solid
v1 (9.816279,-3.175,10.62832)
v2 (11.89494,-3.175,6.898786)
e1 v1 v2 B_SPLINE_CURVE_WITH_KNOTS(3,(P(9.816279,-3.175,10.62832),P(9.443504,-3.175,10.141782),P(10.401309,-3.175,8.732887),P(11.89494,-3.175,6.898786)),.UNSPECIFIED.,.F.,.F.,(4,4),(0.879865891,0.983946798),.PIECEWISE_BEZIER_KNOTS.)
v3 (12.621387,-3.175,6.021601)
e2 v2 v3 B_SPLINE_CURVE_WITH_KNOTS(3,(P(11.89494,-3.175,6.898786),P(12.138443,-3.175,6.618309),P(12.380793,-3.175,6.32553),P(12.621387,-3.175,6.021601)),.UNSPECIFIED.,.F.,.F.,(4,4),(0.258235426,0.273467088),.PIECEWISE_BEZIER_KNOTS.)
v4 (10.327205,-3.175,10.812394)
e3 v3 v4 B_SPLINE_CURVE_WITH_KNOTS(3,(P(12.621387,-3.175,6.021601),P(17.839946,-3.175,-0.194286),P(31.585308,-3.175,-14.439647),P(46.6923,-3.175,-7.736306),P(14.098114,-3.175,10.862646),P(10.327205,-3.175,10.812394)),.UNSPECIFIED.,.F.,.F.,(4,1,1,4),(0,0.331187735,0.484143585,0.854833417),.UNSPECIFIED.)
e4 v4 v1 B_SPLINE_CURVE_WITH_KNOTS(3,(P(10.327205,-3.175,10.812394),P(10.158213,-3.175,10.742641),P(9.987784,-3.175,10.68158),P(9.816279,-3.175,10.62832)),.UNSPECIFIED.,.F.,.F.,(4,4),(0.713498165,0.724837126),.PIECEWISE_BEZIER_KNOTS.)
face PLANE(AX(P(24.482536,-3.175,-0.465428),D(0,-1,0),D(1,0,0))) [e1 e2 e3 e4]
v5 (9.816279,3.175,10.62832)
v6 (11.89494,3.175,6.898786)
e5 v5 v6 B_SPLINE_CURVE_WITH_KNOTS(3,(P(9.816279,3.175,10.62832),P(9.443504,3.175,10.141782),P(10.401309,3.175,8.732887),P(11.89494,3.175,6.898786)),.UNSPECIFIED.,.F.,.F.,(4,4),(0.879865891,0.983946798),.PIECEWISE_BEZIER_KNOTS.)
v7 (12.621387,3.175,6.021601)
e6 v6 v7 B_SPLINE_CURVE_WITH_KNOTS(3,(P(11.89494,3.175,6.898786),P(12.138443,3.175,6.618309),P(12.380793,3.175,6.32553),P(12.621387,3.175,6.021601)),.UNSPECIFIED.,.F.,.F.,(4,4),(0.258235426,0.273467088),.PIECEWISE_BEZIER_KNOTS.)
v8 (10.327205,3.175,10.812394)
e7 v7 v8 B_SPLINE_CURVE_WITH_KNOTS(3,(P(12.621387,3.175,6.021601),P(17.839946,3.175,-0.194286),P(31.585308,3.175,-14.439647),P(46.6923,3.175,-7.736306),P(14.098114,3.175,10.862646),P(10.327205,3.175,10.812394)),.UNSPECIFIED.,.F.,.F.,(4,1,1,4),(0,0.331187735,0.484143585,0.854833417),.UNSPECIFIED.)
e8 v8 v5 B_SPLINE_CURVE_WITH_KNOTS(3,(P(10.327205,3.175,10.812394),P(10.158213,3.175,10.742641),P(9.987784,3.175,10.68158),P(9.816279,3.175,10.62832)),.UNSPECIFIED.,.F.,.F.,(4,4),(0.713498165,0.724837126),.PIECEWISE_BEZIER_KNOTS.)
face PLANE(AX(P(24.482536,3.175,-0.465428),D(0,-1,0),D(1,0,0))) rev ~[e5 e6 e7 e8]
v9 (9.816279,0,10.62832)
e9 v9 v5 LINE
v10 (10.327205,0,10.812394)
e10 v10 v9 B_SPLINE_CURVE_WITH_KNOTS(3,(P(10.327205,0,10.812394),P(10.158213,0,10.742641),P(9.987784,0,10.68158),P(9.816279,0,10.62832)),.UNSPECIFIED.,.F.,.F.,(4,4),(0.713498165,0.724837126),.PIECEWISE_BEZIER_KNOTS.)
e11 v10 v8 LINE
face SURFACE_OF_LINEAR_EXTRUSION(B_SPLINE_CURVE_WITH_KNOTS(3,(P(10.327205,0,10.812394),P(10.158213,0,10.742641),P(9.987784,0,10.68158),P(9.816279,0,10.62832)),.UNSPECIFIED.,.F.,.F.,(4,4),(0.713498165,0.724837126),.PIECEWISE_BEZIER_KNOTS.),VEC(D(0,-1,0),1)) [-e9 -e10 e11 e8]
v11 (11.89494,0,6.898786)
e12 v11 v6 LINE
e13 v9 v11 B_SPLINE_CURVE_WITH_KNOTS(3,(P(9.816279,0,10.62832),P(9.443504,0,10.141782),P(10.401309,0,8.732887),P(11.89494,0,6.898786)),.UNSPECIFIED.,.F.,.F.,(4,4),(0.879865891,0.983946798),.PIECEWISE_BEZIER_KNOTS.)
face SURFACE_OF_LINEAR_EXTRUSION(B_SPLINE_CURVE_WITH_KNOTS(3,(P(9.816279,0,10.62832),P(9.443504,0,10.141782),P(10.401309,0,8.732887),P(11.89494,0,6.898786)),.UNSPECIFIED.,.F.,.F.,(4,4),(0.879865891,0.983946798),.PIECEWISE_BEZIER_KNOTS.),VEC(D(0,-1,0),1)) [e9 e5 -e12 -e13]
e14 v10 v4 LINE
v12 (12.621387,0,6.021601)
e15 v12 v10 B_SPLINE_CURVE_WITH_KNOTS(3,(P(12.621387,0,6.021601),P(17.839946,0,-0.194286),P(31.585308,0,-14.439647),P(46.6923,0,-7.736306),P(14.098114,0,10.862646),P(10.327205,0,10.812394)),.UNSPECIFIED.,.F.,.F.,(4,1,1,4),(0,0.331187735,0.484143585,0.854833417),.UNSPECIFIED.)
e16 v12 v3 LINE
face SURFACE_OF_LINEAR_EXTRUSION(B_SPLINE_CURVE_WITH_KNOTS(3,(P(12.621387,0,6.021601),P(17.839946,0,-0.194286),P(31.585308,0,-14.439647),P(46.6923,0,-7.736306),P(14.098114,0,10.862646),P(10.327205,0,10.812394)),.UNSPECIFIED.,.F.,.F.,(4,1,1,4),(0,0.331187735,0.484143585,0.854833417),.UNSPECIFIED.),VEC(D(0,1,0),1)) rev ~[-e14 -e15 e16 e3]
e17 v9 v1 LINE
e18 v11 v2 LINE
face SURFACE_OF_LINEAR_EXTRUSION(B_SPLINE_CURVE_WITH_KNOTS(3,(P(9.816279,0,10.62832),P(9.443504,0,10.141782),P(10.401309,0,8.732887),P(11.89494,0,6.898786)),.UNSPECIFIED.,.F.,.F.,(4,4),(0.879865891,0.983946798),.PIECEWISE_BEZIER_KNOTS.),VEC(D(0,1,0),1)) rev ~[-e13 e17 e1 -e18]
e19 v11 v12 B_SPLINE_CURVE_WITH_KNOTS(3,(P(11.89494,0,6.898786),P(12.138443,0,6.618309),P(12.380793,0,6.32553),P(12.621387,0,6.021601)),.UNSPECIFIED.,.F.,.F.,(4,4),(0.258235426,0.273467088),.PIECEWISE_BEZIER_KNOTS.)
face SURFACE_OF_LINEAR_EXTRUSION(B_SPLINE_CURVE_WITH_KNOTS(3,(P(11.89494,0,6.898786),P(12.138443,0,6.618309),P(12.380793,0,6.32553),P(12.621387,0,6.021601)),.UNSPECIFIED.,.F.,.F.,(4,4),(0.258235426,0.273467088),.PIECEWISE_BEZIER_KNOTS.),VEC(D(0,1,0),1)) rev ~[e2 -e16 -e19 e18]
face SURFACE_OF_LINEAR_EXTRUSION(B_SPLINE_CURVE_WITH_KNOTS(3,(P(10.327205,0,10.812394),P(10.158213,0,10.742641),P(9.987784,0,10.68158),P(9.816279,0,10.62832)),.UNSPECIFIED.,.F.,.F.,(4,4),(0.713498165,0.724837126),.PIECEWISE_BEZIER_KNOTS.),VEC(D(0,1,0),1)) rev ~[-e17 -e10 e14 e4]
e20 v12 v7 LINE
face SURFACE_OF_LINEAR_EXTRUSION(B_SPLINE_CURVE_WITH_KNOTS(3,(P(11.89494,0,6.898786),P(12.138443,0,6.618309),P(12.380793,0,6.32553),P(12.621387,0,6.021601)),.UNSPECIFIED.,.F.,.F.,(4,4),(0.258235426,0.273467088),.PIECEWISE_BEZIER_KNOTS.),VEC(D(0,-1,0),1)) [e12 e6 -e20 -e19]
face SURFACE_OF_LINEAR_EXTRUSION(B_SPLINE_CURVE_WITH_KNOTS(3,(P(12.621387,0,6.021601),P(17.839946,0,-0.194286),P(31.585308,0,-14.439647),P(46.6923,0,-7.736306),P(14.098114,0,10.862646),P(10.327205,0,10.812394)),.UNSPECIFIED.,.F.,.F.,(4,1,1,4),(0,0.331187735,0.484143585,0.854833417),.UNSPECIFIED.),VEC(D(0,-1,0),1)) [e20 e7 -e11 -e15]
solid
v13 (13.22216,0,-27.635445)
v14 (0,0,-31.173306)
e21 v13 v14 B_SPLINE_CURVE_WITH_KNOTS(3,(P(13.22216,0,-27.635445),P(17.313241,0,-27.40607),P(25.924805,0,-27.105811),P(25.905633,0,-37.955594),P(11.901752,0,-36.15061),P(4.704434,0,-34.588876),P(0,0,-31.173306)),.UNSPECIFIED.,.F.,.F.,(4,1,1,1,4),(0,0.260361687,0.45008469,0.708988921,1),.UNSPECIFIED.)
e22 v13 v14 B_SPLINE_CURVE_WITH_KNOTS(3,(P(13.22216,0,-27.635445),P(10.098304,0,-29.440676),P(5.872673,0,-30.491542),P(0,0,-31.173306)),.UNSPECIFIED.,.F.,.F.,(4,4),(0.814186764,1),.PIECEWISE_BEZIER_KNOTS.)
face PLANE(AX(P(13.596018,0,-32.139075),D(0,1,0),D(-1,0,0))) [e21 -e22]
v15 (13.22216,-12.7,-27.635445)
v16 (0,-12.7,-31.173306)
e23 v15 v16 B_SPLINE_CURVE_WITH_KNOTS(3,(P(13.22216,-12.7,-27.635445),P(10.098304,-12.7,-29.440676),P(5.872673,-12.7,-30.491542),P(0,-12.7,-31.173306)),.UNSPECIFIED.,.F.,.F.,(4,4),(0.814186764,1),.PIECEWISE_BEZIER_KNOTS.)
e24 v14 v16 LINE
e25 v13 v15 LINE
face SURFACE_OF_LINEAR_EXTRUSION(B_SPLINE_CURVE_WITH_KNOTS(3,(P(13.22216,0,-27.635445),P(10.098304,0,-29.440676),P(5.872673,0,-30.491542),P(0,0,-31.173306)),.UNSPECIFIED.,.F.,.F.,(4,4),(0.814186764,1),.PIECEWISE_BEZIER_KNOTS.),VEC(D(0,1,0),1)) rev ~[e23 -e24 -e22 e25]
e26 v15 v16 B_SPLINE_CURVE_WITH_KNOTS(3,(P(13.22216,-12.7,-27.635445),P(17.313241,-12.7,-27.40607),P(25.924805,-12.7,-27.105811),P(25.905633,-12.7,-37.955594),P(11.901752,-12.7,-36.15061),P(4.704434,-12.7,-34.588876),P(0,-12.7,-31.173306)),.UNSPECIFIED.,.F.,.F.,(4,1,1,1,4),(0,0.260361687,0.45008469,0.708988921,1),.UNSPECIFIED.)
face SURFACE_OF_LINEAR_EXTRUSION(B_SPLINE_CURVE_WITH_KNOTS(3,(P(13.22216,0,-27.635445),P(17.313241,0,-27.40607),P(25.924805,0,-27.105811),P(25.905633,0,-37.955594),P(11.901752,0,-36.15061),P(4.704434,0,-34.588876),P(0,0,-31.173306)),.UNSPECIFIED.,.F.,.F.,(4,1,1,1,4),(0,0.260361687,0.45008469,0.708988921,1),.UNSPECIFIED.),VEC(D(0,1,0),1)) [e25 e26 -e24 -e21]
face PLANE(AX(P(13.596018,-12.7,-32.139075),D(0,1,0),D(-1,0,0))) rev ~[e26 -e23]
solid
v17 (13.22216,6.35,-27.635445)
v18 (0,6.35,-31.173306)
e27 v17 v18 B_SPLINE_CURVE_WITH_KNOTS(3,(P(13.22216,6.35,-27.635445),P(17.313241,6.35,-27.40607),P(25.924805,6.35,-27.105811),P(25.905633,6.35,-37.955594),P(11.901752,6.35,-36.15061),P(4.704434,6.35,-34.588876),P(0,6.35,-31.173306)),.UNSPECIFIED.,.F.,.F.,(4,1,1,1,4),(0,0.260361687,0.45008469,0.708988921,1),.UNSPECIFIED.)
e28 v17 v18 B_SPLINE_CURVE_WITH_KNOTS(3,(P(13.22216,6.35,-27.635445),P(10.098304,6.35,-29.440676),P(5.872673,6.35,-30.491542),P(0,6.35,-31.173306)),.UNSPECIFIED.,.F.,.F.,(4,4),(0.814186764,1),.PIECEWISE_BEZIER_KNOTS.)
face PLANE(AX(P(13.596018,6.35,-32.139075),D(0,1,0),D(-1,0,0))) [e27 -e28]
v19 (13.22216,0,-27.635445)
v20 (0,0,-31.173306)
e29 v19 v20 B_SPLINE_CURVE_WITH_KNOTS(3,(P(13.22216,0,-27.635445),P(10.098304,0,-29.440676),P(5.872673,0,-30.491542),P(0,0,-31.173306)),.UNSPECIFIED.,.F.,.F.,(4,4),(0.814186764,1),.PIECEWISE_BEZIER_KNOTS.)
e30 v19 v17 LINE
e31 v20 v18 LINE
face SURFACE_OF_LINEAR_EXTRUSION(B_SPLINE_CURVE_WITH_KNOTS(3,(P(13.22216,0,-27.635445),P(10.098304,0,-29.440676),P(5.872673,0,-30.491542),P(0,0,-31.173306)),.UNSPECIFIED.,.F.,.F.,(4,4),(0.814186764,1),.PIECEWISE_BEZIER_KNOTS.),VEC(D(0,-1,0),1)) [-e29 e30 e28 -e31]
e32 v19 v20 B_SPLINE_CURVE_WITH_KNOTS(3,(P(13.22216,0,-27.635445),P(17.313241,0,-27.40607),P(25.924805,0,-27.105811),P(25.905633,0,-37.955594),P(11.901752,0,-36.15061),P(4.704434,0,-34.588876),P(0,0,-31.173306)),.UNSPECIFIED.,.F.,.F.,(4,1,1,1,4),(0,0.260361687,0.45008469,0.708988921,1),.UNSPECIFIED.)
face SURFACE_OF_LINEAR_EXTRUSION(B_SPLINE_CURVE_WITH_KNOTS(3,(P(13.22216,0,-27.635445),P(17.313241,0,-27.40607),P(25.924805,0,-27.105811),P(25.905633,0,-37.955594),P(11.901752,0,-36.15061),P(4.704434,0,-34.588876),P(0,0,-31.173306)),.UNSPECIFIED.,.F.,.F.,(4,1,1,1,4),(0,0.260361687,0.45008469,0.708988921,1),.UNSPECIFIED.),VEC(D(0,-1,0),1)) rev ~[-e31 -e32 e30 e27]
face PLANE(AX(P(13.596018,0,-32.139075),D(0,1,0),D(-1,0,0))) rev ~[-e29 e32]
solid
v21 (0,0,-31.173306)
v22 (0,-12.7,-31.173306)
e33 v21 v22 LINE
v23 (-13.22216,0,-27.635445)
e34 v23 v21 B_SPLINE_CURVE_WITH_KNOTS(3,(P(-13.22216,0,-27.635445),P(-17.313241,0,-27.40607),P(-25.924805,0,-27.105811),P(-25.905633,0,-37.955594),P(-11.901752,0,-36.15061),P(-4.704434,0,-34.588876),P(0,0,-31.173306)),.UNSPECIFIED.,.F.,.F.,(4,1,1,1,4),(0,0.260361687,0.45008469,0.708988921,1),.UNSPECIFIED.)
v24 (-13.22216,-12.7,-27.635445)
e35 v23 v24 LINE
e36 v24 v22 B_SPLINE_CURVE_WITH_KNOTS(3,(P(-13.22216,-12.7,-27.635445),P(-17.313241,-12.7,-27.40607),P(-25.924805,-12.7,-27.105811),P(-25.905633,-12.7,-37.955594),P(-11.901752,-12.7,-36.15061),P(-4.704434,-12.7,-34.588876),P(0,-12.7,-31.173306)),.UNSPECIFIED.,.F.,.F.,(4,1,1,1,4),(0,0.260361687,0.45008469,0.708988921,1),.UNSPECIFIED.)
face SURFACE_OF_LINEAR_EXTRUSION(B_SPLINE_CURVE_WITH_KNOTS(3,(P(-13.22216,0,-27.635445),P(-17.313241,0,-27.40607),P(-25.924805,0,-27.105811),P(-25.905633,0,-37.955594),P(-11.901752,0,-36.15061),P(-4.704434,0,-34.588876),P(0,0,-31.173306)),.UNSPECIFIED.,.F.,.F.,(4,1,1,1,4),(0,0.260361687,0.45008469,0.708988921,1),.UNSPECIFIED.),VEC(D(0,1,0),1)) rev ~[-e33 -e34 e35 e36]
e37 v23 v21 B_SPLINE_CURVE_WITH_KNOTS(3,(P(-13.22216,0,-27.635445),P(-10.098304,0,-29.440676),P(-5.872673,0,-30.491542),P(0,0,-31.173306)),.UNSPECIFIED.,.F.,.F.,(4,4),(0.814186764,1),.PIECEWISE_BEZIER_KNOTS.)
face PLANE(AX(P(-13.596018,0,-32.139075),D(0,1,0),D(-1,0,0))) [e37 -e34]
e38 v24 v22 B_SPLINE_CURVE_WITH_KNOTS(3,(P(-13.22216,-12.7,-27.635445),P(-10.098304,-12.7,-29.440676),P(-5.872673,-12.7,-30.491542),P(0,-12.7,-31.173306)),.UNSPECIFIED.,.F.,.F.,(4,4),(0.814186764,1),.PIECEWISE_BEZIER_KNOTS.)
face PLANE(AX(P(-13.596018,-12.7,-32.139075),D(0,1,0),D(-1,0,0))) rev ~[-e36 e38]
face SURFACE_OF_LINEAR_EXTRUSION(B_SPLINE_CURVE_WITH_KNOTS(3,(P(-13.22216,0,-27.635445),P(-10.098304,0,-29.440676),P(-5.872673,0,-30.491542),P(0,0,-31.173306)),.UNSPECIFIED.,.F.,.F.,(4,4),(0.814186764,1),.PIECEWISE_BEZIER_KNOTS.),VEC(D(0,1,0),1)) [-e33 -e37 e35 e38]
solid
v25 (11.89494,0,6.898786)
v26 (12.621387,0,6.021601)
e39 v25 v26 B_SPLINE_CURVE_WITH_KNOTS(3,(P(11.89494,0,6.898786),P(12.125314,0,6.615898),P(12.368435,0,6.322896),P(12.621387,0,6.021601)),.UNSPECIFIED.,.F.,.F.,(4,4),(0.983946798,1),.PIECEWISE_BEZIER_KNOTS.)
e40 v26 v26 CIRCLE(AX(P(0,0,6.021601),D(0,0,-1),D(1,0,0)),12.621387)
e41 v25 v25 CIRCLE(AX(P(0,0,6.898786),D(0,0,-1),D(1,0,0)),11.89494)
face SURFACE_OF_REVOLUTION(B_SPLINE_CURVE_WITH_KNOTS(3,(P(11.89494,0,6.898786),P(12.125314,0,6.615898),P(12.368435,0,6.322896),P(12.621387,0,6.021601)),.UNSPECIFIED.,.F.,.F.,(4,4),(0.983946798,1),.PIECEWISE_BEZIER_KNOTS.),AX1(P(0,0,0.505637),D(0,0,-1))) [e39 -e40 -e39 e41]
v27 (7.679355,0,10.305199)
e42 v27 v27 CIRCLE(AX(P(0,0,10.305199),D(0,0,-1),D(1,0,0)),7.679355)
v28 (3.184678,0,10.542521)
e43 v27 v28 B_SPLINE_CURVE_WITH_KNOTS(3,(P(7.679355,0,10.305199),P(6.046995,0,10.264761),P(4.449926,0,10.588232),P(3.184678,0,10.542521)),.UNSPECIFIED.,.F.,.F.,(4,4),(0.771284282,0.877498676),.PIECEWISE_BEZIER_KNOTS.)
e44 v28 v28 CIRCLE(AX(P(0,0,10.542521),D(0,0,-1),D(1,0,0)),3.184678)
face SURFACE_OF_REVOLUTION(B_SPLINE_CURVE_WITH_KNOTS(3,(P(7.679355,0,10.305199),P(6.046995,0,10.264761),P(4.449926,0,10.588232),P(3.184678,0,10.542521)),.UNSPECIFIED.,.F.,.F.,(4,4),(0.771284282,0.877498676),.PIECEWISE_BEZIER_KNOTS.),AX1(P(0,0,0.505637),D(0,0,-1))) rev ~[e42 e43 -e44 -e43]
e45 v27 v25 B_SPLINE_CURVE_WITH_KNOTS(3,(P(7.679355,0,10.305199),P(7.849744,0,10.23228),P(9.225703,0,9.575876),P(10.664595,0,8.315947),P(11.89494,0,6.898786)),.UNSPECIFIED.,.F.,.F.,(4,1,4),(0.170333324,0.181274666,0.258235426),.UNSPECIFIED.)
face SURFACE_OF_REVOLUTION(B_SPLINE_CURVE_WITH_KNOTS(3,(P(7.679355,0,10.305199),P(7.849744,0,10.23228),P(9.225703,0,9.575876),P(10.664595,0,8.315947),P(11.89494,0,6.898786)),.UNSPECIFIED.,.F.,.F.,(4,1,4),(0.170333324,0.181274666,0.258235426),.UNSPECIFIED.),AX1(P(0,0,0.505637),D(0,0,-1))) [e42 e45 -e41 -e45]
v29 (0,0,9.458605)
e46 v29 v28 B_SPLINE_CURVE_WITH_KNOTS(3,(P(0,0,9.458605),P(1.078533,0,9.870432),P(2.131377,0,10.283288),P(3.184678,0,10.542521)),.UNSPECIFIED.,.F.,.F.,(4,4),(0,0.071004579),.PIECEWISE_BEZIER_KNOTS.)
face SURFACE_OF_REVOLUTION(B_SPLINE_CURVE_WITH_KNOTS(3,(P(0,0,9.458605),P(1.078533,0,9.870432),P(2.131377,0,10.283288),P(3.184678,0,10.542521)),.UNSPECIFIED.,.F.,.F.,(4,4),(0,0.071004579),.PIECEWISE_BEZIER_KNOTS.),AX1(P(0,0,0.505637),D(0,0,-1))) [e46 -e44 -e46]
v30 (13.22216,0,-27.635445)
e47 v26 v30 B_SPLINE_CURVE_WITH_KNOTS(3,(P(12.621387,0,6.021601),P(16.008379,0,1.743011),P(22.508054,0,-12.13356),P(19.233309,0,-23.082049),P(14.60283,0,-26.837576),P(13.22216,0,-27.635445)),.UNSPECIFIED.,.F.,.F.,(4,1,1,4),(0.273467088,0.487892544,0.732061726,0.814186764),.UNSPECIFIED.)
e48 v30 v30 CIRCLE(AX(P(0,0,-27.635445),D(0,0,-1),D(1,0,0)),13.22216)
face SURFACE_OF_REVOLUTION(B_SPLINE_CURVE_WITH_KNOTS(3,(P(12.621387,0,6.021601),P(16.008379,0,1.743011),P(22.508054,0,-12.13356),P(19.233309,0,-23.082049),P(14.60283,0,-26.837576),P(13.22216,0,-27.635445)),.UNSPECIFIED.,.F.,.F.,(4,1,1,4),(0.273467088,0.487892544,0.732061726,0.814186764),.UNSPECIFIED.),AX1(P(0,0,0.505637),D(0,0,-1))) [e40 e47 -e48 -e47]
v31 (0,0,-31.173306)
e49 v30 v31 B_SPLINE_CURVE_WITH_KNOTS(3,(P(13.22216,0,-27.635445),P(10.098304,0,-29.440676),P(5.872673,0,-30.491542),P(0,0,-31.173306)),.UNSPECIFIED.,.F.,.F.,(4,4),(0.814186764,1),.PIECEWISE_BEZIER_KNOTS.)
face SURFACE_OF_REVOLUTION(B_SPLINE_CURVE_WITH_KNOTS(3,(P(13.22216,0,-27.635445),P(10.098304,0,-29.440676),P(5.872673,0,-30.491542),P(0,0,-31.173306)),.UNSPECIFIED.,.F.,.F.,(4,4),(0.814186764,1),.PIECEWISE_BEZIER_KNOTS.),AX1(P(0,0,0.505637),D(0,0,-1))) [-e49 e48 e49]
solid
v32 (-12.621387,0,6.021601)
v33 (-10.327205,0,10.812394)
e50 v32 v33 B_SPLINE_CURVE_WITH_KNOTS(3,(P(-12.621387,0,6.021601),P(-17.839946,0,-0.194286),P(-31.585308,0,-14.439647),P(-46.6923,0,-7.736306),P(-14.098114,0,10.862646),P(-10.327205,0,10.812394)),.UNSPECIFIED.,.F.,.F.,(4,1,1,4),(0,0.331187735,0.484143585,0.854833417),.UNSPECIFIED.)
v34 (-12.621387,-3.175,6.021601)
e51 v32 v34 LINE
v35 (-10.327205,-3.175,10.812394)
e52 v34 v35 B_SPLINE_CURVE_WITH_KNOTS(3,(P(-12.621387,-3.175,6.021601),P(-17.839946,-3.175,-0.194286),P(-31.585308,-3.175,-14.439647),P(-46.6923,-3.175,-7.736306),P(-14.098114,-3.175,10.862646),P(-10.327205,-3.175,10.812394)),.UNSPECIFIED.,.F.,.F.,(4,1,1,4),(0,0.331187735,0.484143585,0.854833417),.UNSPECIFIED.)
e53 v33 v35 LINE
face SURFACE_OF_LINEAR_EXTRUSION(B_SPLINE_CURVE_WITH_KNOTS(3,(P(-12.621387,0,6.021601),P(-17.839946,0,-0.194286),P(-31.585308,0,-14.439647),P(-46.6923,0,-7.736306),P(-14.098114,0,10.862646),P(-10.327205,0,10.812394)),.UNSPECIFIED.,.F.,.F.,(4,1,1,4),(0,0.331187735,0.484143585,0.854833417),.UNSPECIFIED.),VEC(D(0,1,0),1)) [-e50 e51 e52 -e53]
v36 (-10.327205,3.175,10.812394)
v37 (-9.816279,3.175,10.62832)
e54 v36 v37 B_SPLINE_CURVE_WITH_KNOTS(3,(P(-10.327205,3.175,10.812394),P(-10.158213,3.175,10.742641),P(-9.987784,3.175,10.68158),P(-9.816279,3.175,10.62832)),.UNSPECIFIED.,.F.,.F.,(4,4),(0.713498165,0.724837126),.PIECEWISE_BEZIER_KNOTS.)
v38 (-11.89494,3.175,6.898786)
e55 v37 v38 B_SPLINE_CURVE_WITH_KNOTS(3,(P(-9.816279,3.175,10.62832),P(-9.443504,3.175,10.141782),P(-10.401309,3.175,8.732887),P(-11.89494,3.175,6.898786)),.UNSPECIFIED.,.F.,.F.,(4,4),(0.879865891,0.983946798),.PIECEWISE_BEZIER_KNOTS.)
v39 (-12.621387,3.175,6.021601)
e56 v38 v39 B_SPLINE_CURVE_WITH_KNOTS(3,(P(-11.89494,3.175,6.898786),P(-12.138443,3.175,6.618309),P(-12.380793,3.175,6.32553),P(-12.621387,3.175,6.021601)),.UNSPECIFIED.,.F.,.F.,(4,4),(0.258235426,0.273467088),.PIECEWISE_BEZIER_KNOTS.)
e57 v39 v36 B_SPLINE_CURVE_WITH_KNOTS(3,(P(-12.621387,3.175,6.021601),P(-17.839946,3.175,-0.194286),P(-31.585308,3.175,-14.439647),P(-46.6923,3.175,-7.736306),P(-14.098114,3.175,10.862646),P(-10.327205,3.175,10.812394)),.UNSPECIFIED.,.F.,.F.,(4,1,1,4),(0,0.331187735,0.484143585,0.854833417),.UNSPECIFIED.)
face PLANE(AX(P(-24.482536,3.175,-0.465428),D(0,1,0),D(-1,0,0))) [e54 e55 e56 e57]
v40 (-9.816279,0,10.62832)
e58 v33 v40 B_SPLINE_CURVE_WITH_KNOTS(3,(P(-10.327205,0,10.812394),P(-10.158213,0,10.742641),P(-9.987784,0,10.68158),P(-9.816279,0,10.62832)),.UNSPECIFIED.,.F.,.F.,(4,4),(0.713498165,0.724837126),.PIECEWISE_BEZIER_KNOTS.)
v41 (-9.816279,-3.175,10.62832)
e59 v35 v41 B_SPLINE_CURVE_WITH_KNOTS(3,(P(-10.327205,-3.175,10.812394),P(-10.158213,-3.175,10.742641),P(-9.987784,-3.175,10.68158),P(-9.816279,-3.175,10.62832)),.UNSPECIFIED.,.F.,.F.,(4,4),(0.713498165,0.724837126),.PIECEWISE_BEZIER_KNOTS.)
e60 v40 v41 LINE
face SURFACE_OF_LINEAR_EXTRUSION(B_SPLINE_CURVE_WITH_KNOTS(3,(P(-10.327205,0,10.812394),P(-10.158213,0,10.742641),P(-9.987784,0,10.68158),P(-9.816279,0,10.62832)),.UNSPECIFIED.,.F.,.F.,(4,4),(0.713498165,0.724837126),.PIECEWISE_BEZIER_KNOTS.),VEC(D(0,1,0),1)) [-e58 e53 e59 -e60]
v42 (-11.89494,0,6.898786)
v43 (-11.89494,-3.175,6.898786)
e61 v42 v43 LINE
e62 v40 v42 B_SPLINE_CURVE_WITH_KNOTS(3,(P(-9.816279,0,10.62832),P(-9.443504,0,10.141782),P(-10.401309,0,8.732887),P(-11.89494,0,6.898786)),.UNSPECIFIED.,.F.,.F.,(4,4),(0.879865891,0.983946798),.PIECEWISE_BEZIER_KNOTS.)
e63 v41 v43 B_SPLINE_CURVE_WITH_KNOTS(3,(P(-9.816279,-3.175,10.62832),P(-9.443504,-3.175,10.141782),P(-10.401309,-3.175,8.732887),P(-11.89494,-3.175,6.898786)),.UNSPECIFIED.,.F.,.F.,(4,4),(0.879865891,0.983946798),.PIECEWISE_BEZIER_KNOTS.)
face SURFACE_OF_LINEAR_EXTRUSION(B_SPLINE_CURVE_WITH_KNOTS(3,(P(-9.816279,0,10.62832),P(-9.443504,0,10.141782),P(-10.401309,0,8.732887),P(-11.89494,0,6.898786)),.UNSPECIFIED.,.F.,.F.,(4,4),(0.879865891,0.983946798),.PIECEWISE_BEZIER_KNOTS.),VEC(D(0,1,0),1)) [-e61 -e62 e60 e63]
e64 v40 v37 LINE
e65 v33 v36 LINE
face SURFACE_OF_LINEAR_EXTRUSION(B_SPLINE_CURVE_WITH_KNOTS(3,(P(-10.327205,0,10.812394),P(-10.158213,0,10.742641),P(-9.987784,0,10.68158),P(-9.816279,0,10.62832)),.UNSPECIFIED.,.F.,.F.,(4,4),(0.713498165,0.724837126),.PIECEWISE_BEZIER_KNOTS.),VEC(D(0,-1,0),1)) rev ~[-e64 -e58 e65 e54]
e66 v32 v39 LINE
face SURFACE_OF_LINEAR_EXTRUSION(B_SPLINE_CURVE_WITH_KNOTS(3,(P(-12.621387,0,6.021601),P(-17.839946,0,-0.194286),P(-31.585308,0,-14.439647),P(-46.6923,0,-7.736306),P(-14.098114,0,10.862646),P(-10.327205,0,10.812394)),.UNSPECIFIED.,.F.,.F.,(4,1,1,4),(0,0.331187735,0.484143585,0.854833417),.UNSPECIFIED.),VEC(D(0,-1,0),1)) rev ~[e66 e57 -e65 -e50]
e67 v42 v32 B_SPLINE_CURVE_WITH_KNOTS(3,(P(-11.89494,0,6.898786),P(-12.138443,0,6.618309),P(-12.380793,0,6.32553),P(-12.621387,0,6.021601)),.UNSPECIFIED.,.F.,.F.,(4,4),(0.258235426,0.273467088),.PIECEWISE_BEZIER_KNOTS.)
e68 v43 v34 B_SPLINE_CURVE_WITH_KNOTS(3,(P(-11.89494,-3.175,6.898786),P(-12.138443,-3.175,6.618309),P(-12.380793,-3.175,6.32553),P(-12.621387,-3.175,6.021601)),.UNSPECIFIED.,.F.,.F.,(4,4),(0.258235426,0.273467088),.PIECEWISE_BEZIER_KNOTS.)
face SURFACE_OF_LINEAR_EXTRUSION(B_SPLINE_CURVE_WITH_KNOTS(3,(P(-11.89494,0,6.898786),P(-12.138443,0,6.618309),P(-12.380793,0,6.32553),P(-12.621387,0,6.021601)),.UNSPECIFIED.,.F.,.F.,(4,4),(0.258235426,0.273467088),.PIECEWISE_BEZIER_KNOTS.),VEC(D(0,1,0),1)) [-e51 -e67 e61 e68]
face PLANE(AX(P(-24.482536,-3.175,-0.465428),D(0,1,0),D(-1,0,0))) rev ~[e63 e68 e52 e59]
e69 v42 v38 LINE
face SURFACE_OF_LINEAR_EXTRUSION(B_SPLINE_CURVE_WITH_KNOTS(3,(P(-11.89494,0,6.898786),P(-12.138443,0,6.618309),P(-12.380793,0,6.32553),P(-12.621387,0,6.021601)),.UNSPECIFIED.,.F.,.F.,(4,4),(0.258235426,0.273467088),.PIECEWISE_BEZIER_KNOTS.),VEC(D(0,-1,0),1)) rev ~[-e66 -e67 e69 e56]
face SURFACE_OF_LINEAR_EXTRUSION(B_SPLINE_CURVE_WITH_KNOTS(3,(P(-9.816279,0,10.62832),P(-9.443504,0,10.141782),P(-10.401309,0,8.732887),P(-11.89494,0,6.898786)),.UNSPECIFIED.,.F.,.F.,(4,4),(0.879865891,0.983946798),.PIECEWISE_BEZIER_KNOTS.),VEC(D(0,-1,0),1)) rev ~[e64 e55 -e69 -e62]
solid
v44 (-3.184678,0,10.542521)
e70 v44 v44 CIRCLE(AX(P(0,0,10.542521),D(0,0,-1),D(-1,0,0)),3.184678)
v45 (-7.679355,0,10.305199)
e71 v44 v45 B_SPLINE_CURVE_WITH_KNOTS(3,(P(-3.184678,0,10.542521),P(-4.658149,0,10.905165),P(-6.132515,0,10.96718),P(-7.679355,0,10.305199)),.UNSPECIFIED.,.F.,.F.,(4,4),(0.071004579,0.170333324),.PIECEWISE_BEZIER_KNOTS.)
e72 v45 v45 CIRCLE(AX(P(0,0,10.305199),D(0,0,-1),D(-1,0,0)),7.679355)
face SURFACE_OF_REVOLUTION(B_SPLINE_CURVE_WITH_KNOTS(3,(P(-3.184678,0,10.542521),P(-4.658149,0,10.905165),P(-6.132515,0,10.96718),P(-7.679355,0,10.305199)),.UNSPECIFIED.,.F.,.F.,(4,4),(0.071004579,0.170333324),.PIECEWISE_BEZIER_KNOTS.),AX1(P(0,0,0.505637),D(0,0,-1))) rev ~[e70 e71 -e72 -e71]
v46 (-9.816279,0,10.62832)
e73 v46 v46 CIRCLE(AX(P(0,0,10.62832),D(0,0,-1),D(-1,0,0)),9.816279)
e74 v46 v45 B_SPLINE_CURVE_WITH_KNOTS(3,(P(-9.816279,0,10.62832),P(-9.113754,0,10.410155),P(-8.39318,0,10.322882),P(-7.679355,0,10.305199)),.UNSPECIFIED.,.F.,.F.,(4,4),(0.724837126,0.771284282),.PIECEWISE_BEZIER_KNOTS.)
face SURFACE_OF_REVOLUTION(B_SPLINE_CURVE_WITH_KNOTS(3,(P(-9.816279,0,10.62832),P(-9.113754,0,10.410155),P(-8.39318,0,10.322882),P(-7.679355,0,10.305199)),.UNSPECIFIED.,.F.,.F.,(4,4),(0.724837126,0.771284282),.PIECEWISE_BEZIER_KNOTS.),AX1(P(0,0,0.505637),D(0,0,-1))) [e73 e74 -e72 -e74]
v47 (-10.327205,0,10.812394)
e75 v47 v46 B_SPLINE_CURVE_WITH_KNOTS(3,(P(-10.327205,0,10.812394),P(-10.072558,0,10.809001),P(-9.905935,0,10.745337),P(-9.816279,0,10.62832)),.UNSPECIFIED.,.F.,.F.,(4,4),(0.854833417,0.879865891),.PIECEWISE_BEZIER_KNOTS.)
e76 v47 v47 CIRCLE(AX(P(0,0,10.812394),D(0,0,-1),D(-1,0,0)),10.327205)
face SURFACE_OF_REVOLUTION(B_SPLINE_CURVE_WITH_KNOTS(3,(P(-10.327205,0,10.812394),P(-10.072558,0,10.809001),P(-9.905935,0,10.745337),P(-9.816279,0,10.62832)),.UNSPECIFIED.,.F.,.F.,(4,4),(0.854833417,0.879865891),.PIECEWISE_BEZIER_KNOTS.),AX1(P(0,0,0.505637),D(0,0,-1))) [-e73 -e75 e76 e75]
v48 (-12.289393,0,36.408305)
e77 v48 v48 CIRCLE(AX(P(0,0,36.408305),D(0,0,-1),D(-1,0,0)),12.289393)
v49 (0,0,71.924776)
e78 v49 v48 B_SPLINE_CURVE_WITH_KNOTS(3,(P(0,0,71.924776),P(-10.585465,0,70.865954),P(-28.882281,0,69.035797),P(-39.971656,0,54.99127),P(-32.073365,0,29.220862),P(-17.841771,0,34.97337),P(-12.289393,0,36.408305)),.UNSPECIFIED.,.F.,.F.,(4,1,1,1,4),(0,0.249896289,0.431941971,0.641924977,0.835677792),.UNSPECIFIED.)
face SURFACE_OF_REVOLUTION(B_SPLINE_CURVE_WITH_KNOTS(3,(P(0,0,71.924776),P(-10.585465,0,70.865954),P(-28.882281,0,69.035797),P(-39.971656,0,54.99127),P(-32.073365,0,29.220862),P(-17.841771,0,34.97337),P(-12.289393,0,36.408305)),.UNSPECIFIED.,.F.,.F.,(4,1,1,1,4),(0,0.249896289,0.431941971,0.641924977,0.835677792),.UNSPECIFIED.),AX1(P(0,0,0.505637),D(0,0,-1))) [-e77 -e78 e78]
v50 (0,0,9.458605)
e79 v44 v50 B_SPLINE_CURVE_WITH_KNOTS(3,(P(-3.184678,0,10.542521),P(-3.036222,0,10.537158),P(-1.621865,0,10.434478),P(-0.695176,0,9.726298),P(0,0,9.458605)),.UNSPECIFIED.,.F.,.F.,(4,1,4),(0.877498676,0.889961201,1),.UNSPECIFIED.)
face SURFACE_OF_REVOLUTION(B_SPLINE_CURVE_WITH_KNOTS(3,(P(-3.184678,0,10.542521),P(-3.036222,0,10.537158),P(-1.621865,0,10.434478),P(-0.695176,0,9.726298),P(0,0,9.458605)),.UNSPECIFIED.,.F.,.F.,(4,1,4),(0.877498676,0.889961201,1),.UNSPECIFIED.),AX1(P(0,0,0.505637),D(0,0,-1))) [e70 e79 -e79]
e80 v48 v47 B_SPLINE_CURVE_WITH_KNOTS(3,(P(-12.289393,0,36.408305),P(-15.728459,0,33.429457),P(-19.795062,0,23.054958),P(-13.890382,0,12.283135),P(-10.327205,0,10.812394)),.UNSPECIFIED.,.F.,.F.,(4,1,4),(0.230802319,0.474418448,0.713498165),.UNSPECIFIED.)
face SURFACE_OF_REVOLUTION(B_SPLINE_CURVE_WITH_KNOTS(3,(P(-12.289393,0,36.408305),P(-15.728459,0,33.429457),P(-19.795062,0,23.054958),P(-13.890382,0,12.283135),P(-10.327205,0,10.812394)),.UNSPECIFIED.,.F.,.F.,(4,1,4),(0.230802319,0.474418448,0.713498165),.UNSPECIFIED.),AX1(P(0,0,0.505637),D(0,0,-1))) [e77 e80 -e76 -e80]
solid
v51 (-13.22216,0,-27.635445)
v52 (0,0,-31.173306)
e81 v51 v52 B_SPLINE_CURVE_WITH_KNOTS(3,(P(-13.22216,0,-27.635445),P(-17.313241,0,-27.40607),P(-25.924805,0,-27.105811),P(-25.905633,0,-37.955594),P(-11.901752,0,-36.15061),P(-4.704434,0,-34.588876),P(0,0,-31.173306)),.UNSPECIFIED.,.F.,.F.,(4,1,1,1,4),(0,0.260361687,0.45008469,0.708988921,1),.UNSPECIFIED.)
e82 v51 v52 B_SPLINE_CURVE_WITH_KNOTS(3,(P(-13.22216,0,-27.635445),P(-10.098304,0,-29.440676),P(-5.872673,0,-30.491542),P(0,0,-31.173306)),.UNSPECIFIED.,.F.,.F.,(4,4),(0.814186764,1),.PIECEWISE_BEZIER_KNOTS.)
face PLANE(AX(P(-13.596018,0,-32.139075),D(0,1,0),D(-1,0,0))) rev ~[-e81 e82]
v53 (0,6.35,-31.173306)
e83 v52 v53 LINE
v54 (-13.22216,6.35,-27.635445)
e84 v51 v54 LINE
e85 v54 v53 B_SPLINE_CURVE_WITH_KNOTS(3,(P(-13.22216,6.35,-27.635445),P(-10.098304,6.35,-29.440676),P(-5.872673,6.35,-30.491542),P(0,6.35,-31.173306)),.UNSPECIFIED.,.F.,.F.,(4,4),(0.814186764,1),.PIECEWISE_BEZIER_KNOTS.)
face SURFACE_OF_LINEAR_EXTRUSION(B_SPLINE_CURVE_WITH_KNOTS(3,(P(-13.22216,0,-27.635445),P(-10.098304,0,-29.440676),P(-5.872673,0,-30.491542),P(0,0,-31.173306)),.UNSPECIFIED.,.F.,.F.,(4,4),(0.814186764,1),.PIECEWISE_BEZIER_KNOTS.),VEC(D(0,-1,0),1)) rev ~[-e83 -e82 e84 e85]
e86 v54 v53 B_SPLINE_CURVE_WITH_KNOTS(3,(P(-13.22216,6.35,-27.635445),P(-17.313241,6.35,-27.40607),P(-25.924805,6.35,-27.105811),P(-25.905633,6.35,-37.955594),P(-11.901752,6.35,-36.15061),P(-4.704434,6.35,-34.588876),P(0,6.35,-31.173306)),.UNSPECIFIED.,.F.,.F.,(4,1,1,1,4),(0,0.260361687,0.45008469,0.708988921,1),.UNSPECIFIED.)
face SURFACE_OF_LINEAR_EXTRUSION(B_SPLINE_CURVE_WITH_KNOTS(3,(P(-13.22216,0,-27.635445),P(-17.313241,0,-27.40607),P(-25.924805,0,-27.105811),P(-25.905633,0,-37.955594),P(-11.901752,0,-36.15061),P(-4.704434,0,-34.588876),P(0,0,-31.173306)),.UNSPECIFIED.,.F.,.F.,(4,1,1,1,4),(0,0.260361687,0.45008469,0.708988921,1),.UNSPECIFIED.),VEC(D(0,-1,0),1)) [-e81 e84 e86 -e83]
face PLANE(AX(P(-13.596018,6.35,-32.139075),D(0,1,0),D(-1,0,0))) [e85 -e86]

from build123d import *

# Parameters (mm, degrees)
F2_DEPTH = 3.175
F3_DEPTH = 12.7
F4_DEPTH = 6.35


with BuildPart() as f1:
    # F0 (on Front) → F1 (revolve)
    with BuildSketch(Plane.XZ):
        with BuildLine():
            Line((0, 40.5440760271), (0, 71.9247758389))
            add(Edge.make_bspline(
                [(0, 71.9247758389), (-10.5854645625, 70.8659542485), (-28.8822806187, 69.0357970776), (-39.9716556363, 54.991269554), (-32.0733651409, 29.2208619873), (-17.841770712, 34.9733702393), (-12.2893932233, 36.4083050153)],
                knots=[0, 0, 0, 0, 0.2498962885, 0.4319419707, 0.6419249767, 0.8356777921, 0.8356777921, 0.8356777921, 0.8356777921], degree=3))
            add(Edge.make_bspline(
                [(0, 40.5440760271), (-4.5284186079, 40.0266843128), (-9.0312162462, 39.2304703796), (-12.2893932233, 36.4083050153)],
                knots=[0, 0, 0, 0, 0.2308023195, 0.2308023195, 0.2308023195, 0.2308023195], degree=3))
        make_face()
        with BuildLine():
            Line((0, 38.1521359086), (0, 40.5440760271))
            add(Edge.make_bspline(
                [(0, 40.5440760271), (-4.5284186079, 40.0266843128), (-9.0312162462, 39.2304703796), (-12.2893932233, 36.4083050153)],
                knots=[0, 0, 0, 0, 0.2308023195, 0.2308023195, 0.2308023195, 0.2308023195], degree=3))
            add(Edge.make_bspline(
                [(-12.2893932233, 36.4083050153), (-7.5804091174, 37.6252764959), (-3.7902045587, 37.8887062023), (0, 38.1521359086)],
                knots=[0.8356777921, 0.8356777921, 0.8356777921, 0.8356777921, 1, 1, 1, 1], degree=3))
        make_face()
        with BuildLine():
            add(Edge.make_bspline(
                [(-12.2893932233, 36.4083050153), (-7.5804091174, 37.6252764959), (-3.7902045587, 37.8887062023), (0, 38.1521359086)],
                knots=[0.8356777921, 0.8356777921, 0.8356777921, 0.8356777921, 1, 1, 1, 1], degree=3))
            add(Edge.make_bspline(
                [(-12.2893932233, 36.4083050153), (-15.7284594552, 33.4294571278), (-19.7950616175, 23.0549580863), (-13.8903816598, 12.283135182), (-10.3272052615, 10.8123944002)],
                knots=[0.2308023195, 0.2308023195, 0.2308023195, 0.2308023195, 0.4744184485, 0.713498165, 0.713498165, 0.713498165, 0.713498165], degree=3))
            add(Edge.make_bspline(
                [(-10.3272052615, 10.8123944002), (-10.0725579486, 10.8090009422), (-9.9059347314, 10.7453373429), (-9.8162787914, 10.6283200932)],
                knots=[0.8548334172, 0.8548334172, 0.8548334172, 0.8548334172, 0.8798658908, 0.8798658908, 0.8798658908, 0.8798658908], degree=3))
            add(Edge.make_bspline(
                [(-9.8162787914, 10.6283200932), (-9.1137535972, 10.4101545267), (-8.3931801359, 10.322881828), (-7.6793552666, 10.3051986154)],
                knots=[0.7248371265, 0.7248371265, 0.7248371265, 0.7248371265, 0.7712842823, 0.7712842823, 0.7712842823, 0.7712842823], degree=3))
            add(Edge.make_bspline(
                [(-3.1846784663, 10.5425213196), (-4.6581488019, 10.9051649254), (-6.1325150121, 10.9671798034), (-7.6793552671, 10.3051986181)],
                knots=[0.0710045794, 0.0710045794, 0.0710045794, 0.0710045794, 0.1703333243, 0.1703333243, 0.1703333243, 0.1703333243], degree=3))
            add(Edge.make_bspline(
                [(-3.1846784663, 10.5425213196), (-3.0362223015, 10.5371579355), (-1.6218651964, 10.4344784463), (-0.6951761314, 9.7262982289), (0, 9.4586049693)],
                knots=[0.8774986759, 0.8774986759, 0.8774986759, 0.8774986759, 0.8899612006, 1, 1, 1, 1], degree=3))
            Line((0, 9.4586049693), (0, 38.1521359086))
        make_face()
    revolve(axis=Axis((0, 0, 0.5056373775), (0, 0, -1)))


with BuildPart() as f1b:
    # F0 (on Front) → F1, piece 2 (revolve)
    with BuildSketch(Plane.XZ):
        with BuildLine():
            add(Edge.make_bspline(
                [(0, 9.4586049693), (1.0785327456, 9.8704319859), (2.131376709, 10.2832876329), (3.1846784663, 10.5425213196)],
                knots=[0, 0, 0, 0, 0.0710045794, 0.0710045794, 0.0710045794, 0.0710045794], degree=3))
            Line((0, 9.4586049693), (0, 0))
            Line((0, 0), (0, -31.173305586))
            add(Edge.make_bspline(
                [(13.22216002, -27.6354453357), (10.0983043363, -29.4406761674), (5.8726727159, -30.4915417833), (0, -31.173305586)],
                knots=[0.8141867643, 0.8141867643, 0.8141867643, 0.8141867643, 1, 1, 1, 1], degree=3))
            add(Edge.make_bspline(
                [(12.621386915, 6.0216014374), (16.0083791906, 1.743010511), (22.5080544597, -12.133560287), (19.2333086543, -23.0820491065), (14.6028300587, -26.8375761719), (13.22216002, -27.6354453357)],
                knots=[0.2734670882, 0.2734670882, 0.2734670882, 0.2734670882, 0.4878925442, 0.732061726, 0.8141867643, 0.8141867643, 0.8141867643, 0.8141867643], degree=3))
            add(Edge.make_bspline(
                [(11.8949395762, 6.8987859434), (12.1253138051, 6.6158984029), (12.3684349547, 6.322895519), (12.621386915, 6.0216014374)],
                knots=[0.9839467979, 0.9839467979, 0.9839467979, 0.9839467979, 1, 1, 1, 1], degree=3))
            add(Edge.make_bspline(
                [(7.6793552671, 10.3051986181), (7.8497440907, 10.2322795206), (9.2257027917, 9.5758758934), (10.664594848, 8.3159473687), (11.8949395762, 6.8987859434)],
                knots=[0.1703333243, 0.1703333243, 0.1703333243, 0.1703333243, 0.1812746661, 0.2582354256, 0.2582354256, 0.2582354256, 0.2582354256], degree=3))
            add(Edge.make_bspline(
                [(7.6793552666, 10.3051986154), (6.0469953416, 10.2647610112), (4.4499262301, 10.5882318478), (3.1846784663, 10.5425213196)],
                knots=[0.7712842823, 0.7712842823, 0.7712842823, 0.7712842823, 0.8774986759, 0.8774986759, 0.8774986759, 0.8774986759], degree=3))
        make_face()
    revolve(axis=Axis((0, 0, 0.5056373775), (0, 0, -1)))


with BuildPart() as f2:
    # F0 (on Front) → F2 (new body, symmetric)
    with BuildSketch(Plane.XZ):
        with BuildLine():
            add(Edge.make_bspline(
                [(-10.3272052615, 10.8123944002), (-10.1582125886, 10.7426407905), (-9.9877835061, 10.6815799955), (-9.8162787914, 10.6283200932)],
                knots=[0.713498165, 0.713498165, 0.713498165, 0.713498165, 0.7248371265, 0.7248371265, 0.7248371265, 0.7248371265], degree=3))
            add(Edge.make_bspline(
                [(-12.621386915, 6.0216014374), (-17.8399461837, -0.1942864324), (-31.5853075666, -14.4396466007), (-46.6922995721, -7.7363055156), (-14.0981138501, 10.862645941), (-10.3272052615, 10.8123944002)],
                knots=[0, 0, 0, 0, 0.3311877351, 0.4841435846, 0.8548334172, 0.8548334172, 0.8548334172, 0.8548334172], degree=3))
            add(Edge.make_bspline(
                [(-11.8949395762, 6.8987859434), (-12.1384428364, 6.6183089198), (-12.3807927025, 6.3255301539), (-12.621386915, 6.0216014374)],
                knots=[0.2582354256, 0.2582354256, 0.2582354256, 0.2582354256, 0.2734670882, 0.2734670882, 0.2734670882, 0.2734670882], degree=3))
            add(Edge.make_bspline(
                [(-9.8162787914, 10.6283200932), (-9.4435041431, 10.1417816202), (-10.4013086806, 8.7328867997), (-11.8949395762, 6.8987859434)],
                knots=[0.8798658908, 0.8798658908, 0.8798658908, 0.8798658908, 0.9839467979, 0.9839467979, 0.9839467979, 0.9839467979], degree=3))
        make_face()
    extrude(amount=F2_DEPTH, both=True)


with BuildPart() as f2b:
    # F0 (on Front) → F2, piece 2 (new body, symmetric)
    with BuildSketch(Plane.XZ):
        with BuildLine():
            add(Edge.make_bspline(
                [(12.621386915, 6.0216014374), (17.8399461837, -0.1942864324), (31.5853075666, -14.4396466007), (46.6922995721, -7.7363055156), (14.0981138501, 10.862645941), (10.3272052615, 10.8123944002)],
                knots=[0, 0, 0, 0, 0.3311877351, 0.4841435846, 0.8548334172, 0.8548334172, 0.8548334172, 0.8548334172], degree=3))
            add(Edge.make_bspline(
                [(10.3272052615, 10.8123944002), (10.1582125886, 10.7426407905), (9.9877835061, 10.6815799955), (9.8162787914, 10.6283200932)],
                knots=[0.713498165, 0.713498165, 0.713498165, 0.713498165, 0.7248371265, 0.7248371265, 0.7248371265, 0.7248371265], degree=3))
            add(Edge.make_bspline(
                [(9.8162787914, 10.6283200932), (9.4435041431, 10.1417816202), (10.4013086806, 8.7328867997), (11.8949395762, 6.8987859434)],
                knots=[0.8798658908, 0.8798658908, 0.8798658908, 0.8798658908, 0.9839467979, 0.9839467979, 0.9839467979, 0.9839467979], degree=3))
            add(Edge.make_bspline(
                [(11.8949395762, 6.8987859434), (12.1384428364, 6.6183089198), (12.3807927025, 6.3255301539), (12.621386915, 6.0216014374)],
                knots=[0.2582354256, 0.2582354256, 0.2582354256, 0.2582354256, 0.2734670882, 0.2734670882, 0.2734670882, 0.2734670882], degree=3))
        make_face()
    extrude(amount=F2_DEPTH, both=True)


with BuildPart() as f3:
    # F0 (on Front) → F3 (new body)
    with BuildSketch(Plane.XZ):
        with BuildLine():
            add(Edge.make_bspline(
                [(13.22216002, -27.6354453357), (17.3132413575, -27.4060696494), (25.9248047573, -27.1058110564), (25.9056330976, -37.9555936987), (11.9017516816, -36.1506097667), (4.7044344075, -34.5888761575), (0, -31.173305586)],
                knots=[0, 0, 0, 0, 0.2603616875, 0.4500846903, 0.7089889209, 1, 1, 1, 1], degree=3))
            add(Edge.make_bspline(
                [(13.22216002, -27.6354453357), (10.0983043363, -29.4406761674), (5.8726727159, -30.4915417833), (0, -31.173305586)],
                knots=[0.8141867643, 0.8141867643, 0.8141867643, 0.8141867643, 1, 1, 1, 1], degree=3))
        make_face()
    extrude(amount=F3_DEPTH)


with BuildPart() as f3b:
    # F0 (on Front) → F3, piece 2 (new body)
    with BuildSketch(Plane.XZ):
        with BuildLine():
            add(Edge.make_bspline(
                [(-13.22216002, -27.6354453357), (-10.0983043363, -29.4406761674), (-5.8726727159, -30.4915417833), (0, -31.173305586)],
                knots=[0.8141867643, 0.8141867643, 0.8141867643, 0.8141867643, 1, 1, 1, 1], degree=3))
            add(Edge.make_bspline(
                [(-13.22216002, -27.6354453357), (-17.3132413575, -27.4060696494), (-25.9248047573, -27.1058110564), (-25.9056330976, -37.9555936987), (-11.9017516816, -36.1506097667), (-4.7044344075, -34.5888761575), (0, -31.173305586)],
                knots=[0, 0, 0, 0, 0.2603616875, 0.4500846903, 0.7089889209, 1, 1, 1, 1], degree=3))
        make_face()
    extrude(amount=F3_DEPTH)


with BuildPart() as f4:
    # F0 (on Front) → F4 (new body)
    with BuildSketch(Plane.XZ):
        with BuildLine():
            add(Edge.make_bspline(
                [(13.22216002, -27.6354453357), (17.3132413575, -27.4060696494), (25.9248047573, -27.1058110564), (25.9056330976, -37.9555936987), (11.9017516816, -36.1506097667), (4.7044344075, -34.5888761575), (0, -31.173305586)],
                knots=[0, 0, 0, 0, 0.2603616875, 0.4500846903, 0.7089889209, 1, 1, 1, 1], degree=3))
            add(Edge.make_bspline(
                [(13.22216002, -27.6354453357), (10.0983043363, -29.4406761674), (5.8726727159, -30.4915417833), (0, -31.173305586)],
                knots=[0.8141867643, 0.8141867643, 0.8141867643, 0.8141867643, 1, 1, 1, 1], degree=3))
        make_face()
    extrude(amount=-F4_DEPTH)


with BuildPart() as f4b:
    # F0 (on Front) → F4, piece 2 (new body)
    with BuildSketch(Plane.XZ):
        with BuildLine():
            add(Edge.make_bspline(
                [(-13.22216002, -27.6354453357), (-10.0983043363, -29.4406761674), (-5.8726727159, -30.4915417833), (0, -31.173305586)],
                knots=[0.8141867643, 0.8141867643, 0.8141867643, 0.8141867643, 1, 1, 1, 1], degree=3))
            add(Edge.make_bspline(
                [(-13.22216002, -27.6354453357), (-17.3132413575, -27.4060696494), (-25.9248047573, -27.1058110564), (-25.9056330976, -37.9555936987), (-11.9017516816, -36.1506097667), (-4.7044344075, -34.5888761575), (0, -31.173305586)],
                knots=[0, 0, 0, 0, 0.2603616875, 0.4500846903, 0.7089889209, 1, 1, 1, 1], degree=3))
        make_face()
    extrude(amount=-F4_DEPTH)


solid = Compound([f1.part, f1b.part, f2.part, f2b.part, f3.part, f3b.part, f4.part, f4b.part])
